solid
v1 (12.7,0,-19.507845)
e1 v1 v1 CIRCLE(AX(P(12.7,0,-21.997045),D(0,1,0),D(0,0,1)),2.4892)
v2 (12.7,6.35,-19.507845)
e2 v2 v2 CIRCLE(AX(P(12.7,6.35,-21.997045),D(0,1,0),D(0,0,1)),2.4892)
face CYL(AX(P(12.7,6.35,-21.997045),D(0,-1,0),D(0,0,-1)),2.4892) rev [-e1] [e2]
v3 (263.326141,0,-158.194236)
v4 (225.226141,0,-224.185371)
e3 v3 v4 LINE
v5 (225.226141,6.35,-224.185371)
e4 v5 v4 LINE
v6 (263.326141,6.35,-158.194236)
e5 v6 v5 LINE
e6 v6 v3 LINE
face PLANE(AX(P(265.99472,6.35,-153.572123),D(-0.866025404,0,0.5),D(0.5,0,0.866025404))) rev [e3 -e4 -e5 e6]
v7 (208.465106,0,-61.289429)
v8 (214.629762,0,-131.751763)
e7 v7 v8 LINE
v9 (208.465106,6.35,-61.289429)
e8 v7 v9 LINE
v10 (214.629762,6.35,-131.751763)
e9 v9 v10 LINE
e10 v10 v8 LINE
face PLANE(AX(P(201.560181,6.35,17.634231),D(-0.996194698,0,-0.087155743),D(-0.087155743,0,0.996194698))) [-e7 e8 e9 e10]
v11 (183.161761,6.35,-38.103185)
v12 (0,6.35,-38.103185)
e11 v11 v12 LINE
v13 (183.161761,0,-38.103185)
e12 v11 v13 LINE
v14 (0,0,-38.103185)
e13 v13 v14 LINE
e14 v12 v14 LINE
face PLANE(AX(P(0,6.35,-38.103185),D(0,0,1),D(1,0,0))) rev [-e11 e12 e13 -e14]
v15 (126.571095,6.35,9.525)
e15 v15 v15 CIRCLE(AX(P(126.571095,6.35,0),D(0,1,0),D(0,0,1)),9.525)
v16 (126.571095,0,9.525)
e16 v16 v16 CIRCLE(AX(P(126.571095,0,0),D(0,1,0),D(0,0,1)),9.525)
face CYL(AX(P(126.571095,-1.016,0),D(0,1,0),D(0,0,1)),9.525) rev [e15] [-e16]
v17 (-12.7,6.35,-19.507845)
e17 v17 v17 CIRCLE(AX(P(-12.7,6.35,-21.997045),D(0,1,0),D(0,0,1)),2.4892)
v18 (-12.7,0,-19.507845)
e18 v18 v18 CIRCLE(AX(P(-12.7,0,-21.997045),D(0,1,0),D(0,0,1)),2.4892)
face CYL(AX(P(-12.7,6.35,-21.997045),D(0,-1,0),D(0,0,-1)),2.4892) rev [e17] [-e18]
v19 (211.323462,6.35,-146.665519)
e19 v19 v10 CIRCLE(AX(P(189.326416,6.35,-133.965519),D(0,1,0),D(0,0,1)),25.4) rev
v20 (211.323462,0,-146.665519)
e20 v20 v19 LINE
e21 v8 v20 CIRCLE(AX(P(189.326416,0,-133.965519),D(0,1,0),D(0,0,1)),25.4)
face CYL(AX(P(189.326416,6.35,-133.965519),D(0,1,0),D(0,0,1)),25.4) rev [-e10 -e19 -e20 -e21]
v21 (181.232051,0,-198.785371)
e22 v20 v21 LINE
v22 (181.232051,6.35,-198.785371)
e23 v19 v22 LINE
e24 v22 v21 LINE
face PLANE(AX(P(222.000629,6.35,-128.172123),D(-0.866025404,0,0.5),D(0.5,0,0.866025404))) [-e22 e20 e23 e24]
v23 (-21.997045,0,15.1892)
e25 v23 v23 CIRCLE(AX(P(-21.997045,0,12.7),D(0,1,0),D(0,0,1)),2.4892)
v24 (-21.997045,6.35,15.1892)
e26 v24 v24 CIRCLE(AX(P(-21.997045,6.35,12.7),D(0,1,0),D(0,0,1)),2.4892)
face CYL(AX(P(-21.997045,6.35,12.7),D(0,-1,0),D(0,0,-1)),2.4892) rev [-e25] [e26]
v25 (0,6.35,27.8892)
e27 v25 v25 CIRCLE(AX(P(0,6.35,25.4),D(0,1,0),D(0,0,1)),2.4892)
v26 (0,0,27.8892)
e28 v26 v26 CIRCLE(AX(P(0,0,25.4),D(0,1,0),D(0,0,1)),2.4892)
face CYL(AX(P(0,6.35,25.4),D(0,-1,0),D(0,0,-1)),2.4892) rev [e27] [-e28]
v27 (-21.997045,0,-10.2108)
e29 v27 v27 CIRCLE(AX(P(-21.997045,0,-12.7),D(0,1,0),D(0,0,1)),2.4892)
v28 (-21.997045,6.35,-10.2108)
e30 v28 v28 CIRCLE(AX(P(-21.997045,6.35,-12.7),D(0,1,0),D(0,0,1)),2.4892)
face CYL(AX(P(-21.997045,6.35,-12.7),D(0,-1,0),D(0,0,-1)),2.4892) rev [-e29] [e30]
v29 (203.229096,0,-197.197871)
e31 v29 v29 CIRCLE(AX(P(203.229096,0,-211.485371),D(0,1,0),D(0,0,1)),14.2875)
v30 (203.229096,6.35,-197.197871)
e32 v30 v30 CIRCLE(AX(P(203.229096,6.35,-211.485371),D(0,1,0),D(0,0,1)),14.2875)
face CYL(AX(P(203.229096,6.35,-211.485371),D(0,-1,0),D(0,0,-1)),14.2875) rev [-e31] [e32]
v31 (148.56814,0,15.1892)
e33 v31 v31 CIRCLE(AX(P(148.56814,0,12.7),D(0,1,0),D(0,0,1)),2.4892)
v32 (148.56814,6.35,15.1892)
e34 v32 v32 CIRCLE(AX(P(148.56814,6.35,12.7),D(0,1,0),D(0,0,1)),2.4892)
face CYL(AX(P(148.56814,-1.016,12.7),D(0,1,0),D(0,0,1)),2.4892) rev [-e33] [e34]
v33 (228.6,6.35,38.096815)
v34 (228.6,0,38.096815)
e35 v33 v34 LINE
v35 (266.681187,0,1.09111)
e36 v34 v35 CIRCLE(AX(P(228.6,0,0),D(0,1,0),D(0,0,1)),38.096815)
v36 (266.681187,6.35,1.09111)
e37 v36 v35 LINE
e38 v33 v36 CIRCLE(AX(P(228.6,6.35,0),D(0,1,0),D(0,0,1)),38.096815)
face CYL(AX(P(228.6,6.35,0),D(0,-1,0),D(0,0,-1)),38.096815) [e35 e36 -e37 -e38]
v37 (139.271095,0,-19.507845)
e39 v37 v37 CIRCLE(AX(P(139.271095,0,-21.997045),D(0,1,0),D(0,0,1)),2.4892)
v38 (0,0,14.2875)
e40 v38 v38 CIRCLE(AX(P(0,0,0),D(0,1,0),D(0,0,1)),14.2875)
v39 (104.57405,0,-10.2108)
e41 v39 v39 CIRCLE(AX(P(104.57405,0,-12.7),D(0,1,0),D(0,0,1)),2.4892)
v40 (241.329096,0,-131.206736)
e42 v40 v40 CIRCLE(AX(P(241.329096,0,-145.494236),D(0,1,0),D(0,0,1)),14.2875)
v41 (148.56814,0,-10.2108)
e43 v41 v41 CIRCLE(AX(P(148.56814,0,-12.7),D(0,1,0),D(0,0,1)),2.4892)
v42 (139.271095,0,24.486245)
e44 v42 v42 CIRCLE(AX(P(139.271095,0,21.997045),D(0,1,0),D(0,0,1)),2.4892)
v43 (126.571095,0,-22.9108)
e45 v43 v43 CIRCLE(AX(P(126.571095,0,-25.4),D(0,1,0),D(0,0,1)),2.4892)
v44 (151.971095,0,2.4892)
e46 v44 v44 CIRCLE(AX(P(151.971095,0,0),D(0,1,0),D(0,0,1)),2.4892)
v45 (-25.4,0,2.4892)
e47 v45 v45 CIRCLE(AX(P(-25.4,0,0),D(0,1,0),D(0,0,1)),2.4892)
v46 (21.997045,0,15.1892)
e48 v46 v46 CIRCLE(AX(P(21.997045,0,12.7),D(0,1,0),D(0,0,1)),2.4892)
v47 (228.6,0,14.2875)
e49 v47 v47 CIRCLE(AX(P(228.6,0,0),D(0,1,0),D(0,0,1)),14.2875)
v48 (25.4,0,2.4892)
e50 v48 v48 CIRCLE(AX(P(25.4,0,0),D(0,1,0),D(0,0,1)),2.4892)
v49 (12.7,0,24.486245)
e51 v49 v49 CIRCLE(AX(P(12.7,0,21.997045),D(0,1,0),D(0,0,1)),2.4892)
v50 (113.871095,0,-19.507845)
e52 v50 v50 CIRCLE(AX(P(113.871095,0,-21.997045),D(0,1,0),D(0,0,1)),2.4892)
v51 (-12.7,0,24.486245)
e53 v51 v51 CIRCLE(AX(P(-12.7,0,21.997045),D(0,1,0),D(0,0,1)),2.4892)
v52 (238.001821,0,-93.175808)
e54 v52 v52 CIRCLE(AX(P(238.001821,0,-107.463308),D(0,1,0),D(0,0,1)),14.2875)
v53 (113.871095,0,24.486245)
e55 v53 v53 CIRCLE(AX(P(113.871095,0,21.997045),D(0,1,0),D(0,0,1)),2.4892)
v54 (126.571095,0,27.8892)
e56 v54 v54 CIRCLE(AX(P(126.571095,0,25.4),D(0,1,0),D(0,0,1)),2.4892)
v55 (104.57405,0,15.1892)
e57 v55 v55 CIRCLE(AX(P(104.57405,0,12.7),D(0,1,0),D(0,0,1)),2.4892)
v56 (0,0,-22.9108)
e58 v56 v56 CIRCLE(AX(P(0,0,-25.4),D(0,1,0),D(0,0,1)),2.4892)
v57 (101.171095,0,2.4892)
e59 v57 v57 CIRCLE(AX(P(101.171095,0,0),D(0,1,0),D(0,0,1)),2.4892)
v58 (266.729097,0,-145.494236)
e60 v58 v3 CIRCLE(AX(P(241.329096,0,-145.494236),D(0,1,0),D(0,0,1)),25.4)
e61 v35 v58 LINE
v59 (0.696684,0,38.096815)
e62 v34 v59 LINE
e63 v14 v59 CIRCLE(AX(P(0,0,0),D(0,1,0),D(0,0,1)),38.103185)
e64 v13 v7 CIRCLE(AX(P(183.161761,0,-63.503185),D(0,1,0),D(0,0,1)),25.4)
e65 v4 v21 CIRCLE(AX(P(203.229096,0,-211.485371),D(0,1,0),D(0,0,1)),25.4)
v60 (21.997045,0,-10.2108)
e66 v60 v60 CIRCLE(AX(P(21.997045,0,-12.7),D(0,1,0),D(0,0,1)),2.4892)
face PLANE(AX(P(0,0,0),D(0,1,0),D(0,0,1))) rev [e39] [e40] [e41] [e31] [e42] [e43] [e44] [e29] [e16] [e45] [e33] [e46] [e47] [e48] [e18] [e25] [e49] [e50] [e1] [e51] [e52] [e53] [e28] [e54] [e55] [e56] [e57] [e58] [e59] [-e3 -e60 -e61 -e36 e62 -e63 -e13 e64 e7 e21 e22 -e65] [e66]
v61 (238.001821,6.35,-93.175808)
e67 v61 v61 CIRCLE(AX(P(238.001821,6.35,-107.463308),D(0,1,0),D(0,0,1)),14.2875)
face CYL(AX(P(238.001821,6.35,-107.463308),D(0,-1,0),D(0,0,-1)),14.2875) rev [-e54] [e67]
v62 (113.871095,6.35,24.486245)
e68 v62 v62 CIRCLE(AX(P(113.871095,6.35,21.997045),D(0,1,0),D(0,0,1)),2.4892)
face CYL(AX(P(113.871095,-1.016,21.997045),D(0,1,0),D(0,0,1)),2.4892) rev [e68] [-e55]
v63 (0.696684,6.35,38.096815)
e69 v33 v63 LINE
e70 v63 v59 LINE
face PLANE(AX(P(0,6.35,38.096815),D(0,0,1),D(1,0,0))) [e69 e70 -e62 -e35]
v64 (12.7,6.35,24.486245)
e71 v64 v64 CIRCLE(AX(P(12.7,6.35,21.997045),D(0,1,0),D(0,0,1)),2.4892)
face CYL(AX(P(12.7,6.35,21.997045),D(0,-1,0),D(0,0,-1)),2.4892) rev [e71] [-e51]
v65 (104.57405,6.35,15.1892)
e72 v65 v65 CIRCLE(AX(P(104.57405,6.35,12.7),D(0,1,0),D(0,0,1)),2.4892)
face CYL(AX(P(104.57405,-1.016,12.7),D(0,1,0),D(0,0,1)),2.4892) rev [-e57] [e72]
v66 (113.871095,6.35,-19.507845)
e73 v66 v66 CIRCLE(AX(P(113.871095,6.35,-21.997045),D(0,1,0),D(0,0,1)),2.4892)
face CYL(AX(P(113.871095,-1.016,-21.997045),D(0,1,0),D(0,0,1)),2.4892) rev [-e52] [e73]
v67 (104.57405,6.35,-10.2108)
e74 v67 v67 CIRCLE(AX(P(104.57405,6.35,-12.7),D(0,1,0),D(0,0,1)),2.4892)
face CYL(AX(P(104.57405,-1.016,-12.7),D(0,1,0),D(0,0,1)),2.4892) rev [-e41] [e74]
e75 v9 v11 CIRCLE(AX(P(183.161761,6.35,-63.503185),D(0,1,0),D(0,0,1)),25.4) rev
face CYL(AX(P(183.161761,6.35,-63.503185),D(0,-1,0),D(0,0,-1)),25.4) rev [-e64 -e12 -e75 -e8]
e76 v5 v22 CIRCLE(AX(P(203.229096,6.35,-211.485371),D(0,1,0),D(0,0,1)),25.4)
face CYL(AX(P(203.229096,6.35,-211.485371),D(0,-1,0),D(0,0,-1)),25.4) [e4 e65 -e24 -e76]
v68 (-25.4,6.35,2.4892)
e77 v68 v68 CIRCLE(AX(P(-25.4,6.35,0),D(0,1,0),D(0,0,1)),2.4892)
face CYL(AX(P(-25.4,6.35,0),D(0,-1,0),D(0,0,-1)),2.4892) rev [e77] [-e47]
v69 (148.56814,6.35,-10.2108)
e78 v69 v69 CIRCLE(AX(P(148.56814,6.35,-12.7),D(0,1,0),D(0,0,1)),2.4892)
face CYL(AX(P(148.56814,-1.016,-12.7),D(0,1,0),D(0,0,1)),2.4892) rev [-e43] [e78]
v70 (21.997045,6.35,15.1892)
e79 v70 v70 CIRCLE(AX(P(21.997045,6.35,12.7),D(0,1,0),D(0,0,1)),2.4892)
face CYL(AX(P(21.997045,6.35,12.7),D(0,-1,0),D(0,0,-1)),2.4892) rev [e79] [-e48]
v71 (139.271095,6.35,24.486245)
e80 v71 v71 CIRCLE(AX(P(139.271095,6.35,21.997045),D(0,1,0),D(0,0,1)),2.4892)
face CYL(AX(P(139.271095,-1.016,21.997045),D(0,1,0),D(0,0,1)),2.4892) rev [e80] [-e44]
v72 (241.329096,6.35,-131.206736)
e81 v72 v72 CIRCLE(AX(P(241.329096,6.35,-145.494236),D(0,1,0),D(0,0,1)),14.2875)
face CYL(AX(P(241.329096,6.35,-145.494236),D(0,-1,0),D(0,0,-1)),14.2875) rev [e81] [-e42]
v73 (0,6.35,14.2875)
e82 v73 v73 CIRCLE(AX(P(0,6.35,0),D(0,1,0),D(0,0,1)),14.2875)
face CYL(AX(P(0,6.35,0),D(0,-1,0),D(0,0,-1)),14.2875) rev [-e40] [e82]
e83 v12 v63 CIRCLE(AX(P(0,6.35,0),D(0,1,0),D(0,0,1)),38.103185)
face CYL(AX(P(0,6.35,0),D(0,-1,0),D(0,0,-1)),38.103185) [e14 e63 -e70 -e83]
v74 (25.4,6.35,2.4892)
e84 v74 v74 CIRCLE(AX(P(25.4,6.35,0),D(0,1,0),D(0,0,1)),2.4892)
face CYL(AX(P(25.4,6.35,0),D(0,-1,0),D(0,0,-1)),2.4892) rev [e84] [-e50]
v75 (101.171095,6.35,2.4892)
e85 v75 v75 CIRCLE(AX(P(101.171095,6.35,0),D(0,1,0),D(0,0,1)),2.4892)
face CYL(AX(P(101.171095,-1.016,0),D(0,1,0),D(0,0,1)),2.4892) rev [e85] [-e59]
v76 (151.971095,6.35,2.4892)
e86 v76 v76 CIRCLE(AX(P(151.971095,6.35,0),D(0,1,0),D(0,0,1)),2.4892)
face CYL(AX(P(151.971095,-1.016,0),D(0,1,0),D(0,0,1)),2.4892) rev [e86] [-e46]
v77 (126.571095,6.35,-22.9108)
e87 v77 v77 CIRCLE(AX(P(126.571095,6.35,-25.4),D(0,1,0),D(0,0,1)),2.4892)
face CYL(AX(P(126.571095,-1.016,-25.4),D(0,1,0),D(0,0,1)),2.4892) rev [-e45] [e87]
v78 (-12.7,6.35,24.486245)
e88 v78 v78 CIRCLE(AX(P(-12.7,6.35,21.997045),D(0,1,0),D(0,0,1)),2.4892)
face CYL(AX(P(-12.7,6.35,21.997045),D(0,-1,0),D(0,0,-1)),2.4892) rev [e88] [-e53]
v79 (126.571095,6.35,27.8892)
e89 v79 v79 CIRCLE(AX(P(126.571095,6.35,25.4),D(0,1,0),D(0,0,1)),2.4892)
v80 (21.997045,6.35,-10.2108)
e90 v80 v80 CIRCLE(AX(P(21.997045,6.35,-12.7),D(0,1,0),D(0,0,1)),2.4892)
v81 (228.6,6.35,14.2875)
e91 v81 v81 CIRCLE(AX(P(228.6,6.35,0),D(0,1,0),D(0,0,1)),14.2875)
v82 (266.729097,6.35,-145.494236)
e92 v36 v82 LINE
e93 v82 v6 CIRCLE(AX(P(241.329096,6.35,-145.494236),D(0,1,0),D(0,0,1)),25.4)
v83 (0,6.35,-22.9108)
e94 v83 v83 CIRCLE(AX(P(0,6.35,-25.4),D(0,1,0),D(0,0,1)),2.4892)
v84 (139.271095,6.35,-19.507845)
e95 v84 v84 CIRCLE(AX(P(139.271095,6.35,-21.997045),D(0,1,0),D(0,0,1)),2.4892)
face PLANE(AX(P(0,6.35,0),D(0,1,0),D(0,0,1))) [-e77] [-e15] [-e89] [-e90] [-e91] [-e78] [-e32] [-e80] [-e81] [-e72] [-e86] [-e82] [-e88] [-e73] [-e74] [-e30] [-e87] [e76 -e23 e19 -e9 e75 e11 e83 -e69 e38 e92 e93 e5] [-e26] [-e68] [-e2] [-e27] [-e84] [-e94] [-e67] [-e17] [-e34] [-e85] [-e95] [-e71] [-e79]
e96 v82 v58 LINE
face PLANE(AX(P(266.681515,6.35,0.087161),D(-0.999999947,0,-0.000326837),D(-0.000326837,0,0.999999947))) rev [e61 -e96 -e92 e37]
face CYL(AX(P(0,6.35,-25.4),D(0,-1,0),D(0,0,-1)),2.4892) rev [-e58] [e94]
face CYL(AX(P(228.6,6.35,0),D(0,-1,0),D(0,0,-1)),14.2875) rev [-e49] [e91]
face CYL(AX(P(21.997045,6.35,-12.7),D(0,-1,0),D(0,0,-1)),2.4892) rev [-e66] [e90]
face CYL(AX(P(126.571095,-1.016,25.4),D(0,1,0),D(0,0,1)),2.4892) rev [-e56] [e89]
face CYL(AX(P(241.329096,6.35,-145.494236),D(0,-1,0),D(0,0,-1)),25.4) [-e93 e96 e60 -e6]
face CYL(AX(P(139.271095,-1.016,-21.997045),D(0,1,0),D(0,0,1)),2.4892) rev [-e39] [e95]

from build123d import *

# Parameters (mm, degrees)
BOSS_EXTRUDE1_OUTLINE_R   = 2.4892
BOSS_EXTRUDE1_OUTLINE_R_2 = 14.2875
BOSS_EXTRUDE1_DEPTH       = 6.35
FILLET1_R                 = 25.4
FILLET2_R                 = 25.4
SKETCH2_R                 = 9.525
SKETCH2_R_2               = 2.4892
CUT_EXTRUDE1_DEPTH        = 7.366


# Read off the part's stored shape, not the designer's step: Boss-Extrude1
with BuildPart() as part:
    # Boss-Extrude1 outline → Boss-Extrude1 (new body)
    with BuildSketch(Plane(origin=(0, 0, 0), x_dir=(1, 0, 0), z_dir=(0, 1, 0))):
        with BuildLine():
            Line((206.436572843, 38.103184831), (0, 38.103184831))
            ThreePointArc((0, 38.103184831), (-38.101592382, -0.348356423), (0.696683728, -38.096815169))
            Line((0.696683728, -38.096815169), (228.6, -38.09681517))
            ThreePointArc((228.6, -38.09681517), (255.149948273, -27.321558755), (266.68118702, -1.091110092))
            Line((266.68118702, -1.091110092), (266.729096059, 145.494235656))
            ThreePointArc((266.729096059, 145.494235656), (265.863612052, 152.068239358), (263.326141338, 158.194235572))
            Line((263.326141338, 158.194235572), (225.226141484, 224.185371425))
            ThreePointArc((225.226141484, 224.185371425), (190.529096228, 233.482416681), (181.232050972, 198.785371425))
            Line((181.232050972, 198.785371425), (215.327756353, 139.729877384))
            Line((215.327756353, 139.729877384), (206.436572843, 38.103184831))
        make_face()
        with Locations((-12.7, -21.997045256)):
            Circle(BOSS_EXTRUDE1_OUTLINE_R, mode=Mode.SUBTRACT)
        with Locations((0, -25.4)):
            Circle(BOSS_EXTRUDE1_OUTLINE_R, mode=Mode.SUBTRACT)
        with Locations((-21.997045256, -12.7)):
            Circle(BOSS_EXTRUDE1_OUTLINE_R, mode=Mode.SUBTRACT)
        with Locations((12.7, -21.997045256)):
            Circle(BOSS_EXTRUDE1_OUTLINE_R, mode=Mode.SUBTRACT)
        with Locations((21.997045256, -12.7)):
            Circle(BOSS_EXTRUDE1_OUTLINE_R, mode=Mode.SUBTRACT)
        with Locations((-25.4, 0)):
            Circle(BOSS_EXTRUDE1_OUTLINE_R, mode=Mode.SUBTRACT)
        with Locations((-21.997045256, 12.7)):
            Circle(BOSS_EXTRUDE1_OUTLINE_R, mode=Mode.SUBTRACT)
        Circle(BOSS_EXTRUDE1_OUTLINE_R_2, mode=Mode.SUBTRACT)
        with Locations((-12.7, 21.997045256)):
            Circle(BOSS_EXTRUDE1_OUTLINE_R, mode=Mode.SUBTRACT)
        with Locations((0, 25.4)):
            Circle(BOSS_EXTRUDE1_OUTLINE_R, mode=Mode.SUBTRACT)
        with Locations((25.4, 0)):
            Circle(BOSS_EXTRUDE1_OUTLINE_R, mode=Mode.SUBTRACT)
        with Locations((21.997045256, 12.7)):
            Circle(BOSS_EXTRUDE1_OUTLINE_R, mode=Mode.SUBTRACT)
        with Locations((12.7, 21.997045256)):
            Circle(BOSS_EXTRUDE1_OUTLINE_R, mode=Mode.SUBTRACT)
        with Locations((228.6, 0)):
            Circle(BOSS_EXTRUDE1_OUTLINE_R_2, mode=Mode.SUBTRACT)
        with Locations((238.001821162, 107.463307623)):
            Circle(BOSS_EXTRUDE1_OUTLINE_R_2, mode=Mode.SUBTRACT)
        with Locations((241.329096228, 145.494235656)):
            Circle(BOSS_EXTRUDE1_OUTLINE_R_2, mode=Mode.SUBTRACT)
        with Locations((203.229096228, 211.485371425)):
            Circle(BOSS_EXTRUDE1_OUTLINE_R_2, mode=Mode.SUBTRACT)
    extrude(amount=BOSS_EXTRUDE1_DEPTH)

    # Fillet1
    fillet1_edges = [part.edges().sort_by_distance(p)[0] for p in [
        (215.327756353, 3.175, -139.729877384),
    ]]
    fillet(fillet1_edges, radius=FILLET1_R)

    # Fillet2
    fillet2_edges = [part.edges().sort_by_distance(p)[0] for p in [
        (206.436572843, 3.175, -38.103184831),
    ]]
    fillet(fillet2_edges, radius=FILLET2_R)

    # Sketch2 → Cut-Extrude1 (cut)
    with BuildSketch(Plane(origin=(0, 6.35, 0), x_dir=(1, 0, 0), z_dir=(0, 1, 0))):
        with Locations(Location((126.571094876, 0, 0), (0, 0, 270))):
            Circle(SKETCH2_R)
        with Locations(Location((101.171094876, 0, 0), (0, 0, 270))):
            Circle(SKETCH2_R_2)
        with Locations(Location((104.57404962, 12.7, 0), (0, 0, 270))):
            Circle(SKETCH2_R_2)
        with Locations(Location((113.871094876, 21.997045256, 0), (0, 0, 270))):
            Circle(SKETCH2_R_2)
        with Locations(Location((126.571094876, 25.4, 0), (0, 0, 270))):
            Circle(SKETCH2_R_2)
        with Locations(Location((139.271094876, 21.997045256, 0), (0, 0, 270))):
            Circle(SKETCH2_R_2)
        with Locations(Location((148.568140132, 12.7, 0), (0, 0, 270))):
            Circle(SKETCH2_R_2)
        with Locations(Location((151.971094876, 0, 0), (0, 0, 270))):
            Circle(SKETCH2_R_2)
        with Locations(Location((148.568140132, -12.7, 0), (0, 0, 270))):
            Circle(SKETCH2_R_2)
        with Locations(Location((139.271094876, -21.997045256, 0), (0, 0, 270))):
            Circle(SKETCH2_R_2)
        with Locations(Location((126.571094876, -25.4, 0), (0, 0, 270))):
            Circle(SKETCH2_R_2)
        with Locations(Location((113.871094876, -21.997045256, 0), (0, 0, 270))):
            Circle(SKETCH2_R_2)
        with Locations(Location((104.57404962, -12.7, 0), (0, 0, 270))):
            Circle(SKETCH2_R_2)
    extrude(amount=-CUT_EXTRUDE1_DEPTH, mode=Mode.SUBTRACT)


solid = part.part
